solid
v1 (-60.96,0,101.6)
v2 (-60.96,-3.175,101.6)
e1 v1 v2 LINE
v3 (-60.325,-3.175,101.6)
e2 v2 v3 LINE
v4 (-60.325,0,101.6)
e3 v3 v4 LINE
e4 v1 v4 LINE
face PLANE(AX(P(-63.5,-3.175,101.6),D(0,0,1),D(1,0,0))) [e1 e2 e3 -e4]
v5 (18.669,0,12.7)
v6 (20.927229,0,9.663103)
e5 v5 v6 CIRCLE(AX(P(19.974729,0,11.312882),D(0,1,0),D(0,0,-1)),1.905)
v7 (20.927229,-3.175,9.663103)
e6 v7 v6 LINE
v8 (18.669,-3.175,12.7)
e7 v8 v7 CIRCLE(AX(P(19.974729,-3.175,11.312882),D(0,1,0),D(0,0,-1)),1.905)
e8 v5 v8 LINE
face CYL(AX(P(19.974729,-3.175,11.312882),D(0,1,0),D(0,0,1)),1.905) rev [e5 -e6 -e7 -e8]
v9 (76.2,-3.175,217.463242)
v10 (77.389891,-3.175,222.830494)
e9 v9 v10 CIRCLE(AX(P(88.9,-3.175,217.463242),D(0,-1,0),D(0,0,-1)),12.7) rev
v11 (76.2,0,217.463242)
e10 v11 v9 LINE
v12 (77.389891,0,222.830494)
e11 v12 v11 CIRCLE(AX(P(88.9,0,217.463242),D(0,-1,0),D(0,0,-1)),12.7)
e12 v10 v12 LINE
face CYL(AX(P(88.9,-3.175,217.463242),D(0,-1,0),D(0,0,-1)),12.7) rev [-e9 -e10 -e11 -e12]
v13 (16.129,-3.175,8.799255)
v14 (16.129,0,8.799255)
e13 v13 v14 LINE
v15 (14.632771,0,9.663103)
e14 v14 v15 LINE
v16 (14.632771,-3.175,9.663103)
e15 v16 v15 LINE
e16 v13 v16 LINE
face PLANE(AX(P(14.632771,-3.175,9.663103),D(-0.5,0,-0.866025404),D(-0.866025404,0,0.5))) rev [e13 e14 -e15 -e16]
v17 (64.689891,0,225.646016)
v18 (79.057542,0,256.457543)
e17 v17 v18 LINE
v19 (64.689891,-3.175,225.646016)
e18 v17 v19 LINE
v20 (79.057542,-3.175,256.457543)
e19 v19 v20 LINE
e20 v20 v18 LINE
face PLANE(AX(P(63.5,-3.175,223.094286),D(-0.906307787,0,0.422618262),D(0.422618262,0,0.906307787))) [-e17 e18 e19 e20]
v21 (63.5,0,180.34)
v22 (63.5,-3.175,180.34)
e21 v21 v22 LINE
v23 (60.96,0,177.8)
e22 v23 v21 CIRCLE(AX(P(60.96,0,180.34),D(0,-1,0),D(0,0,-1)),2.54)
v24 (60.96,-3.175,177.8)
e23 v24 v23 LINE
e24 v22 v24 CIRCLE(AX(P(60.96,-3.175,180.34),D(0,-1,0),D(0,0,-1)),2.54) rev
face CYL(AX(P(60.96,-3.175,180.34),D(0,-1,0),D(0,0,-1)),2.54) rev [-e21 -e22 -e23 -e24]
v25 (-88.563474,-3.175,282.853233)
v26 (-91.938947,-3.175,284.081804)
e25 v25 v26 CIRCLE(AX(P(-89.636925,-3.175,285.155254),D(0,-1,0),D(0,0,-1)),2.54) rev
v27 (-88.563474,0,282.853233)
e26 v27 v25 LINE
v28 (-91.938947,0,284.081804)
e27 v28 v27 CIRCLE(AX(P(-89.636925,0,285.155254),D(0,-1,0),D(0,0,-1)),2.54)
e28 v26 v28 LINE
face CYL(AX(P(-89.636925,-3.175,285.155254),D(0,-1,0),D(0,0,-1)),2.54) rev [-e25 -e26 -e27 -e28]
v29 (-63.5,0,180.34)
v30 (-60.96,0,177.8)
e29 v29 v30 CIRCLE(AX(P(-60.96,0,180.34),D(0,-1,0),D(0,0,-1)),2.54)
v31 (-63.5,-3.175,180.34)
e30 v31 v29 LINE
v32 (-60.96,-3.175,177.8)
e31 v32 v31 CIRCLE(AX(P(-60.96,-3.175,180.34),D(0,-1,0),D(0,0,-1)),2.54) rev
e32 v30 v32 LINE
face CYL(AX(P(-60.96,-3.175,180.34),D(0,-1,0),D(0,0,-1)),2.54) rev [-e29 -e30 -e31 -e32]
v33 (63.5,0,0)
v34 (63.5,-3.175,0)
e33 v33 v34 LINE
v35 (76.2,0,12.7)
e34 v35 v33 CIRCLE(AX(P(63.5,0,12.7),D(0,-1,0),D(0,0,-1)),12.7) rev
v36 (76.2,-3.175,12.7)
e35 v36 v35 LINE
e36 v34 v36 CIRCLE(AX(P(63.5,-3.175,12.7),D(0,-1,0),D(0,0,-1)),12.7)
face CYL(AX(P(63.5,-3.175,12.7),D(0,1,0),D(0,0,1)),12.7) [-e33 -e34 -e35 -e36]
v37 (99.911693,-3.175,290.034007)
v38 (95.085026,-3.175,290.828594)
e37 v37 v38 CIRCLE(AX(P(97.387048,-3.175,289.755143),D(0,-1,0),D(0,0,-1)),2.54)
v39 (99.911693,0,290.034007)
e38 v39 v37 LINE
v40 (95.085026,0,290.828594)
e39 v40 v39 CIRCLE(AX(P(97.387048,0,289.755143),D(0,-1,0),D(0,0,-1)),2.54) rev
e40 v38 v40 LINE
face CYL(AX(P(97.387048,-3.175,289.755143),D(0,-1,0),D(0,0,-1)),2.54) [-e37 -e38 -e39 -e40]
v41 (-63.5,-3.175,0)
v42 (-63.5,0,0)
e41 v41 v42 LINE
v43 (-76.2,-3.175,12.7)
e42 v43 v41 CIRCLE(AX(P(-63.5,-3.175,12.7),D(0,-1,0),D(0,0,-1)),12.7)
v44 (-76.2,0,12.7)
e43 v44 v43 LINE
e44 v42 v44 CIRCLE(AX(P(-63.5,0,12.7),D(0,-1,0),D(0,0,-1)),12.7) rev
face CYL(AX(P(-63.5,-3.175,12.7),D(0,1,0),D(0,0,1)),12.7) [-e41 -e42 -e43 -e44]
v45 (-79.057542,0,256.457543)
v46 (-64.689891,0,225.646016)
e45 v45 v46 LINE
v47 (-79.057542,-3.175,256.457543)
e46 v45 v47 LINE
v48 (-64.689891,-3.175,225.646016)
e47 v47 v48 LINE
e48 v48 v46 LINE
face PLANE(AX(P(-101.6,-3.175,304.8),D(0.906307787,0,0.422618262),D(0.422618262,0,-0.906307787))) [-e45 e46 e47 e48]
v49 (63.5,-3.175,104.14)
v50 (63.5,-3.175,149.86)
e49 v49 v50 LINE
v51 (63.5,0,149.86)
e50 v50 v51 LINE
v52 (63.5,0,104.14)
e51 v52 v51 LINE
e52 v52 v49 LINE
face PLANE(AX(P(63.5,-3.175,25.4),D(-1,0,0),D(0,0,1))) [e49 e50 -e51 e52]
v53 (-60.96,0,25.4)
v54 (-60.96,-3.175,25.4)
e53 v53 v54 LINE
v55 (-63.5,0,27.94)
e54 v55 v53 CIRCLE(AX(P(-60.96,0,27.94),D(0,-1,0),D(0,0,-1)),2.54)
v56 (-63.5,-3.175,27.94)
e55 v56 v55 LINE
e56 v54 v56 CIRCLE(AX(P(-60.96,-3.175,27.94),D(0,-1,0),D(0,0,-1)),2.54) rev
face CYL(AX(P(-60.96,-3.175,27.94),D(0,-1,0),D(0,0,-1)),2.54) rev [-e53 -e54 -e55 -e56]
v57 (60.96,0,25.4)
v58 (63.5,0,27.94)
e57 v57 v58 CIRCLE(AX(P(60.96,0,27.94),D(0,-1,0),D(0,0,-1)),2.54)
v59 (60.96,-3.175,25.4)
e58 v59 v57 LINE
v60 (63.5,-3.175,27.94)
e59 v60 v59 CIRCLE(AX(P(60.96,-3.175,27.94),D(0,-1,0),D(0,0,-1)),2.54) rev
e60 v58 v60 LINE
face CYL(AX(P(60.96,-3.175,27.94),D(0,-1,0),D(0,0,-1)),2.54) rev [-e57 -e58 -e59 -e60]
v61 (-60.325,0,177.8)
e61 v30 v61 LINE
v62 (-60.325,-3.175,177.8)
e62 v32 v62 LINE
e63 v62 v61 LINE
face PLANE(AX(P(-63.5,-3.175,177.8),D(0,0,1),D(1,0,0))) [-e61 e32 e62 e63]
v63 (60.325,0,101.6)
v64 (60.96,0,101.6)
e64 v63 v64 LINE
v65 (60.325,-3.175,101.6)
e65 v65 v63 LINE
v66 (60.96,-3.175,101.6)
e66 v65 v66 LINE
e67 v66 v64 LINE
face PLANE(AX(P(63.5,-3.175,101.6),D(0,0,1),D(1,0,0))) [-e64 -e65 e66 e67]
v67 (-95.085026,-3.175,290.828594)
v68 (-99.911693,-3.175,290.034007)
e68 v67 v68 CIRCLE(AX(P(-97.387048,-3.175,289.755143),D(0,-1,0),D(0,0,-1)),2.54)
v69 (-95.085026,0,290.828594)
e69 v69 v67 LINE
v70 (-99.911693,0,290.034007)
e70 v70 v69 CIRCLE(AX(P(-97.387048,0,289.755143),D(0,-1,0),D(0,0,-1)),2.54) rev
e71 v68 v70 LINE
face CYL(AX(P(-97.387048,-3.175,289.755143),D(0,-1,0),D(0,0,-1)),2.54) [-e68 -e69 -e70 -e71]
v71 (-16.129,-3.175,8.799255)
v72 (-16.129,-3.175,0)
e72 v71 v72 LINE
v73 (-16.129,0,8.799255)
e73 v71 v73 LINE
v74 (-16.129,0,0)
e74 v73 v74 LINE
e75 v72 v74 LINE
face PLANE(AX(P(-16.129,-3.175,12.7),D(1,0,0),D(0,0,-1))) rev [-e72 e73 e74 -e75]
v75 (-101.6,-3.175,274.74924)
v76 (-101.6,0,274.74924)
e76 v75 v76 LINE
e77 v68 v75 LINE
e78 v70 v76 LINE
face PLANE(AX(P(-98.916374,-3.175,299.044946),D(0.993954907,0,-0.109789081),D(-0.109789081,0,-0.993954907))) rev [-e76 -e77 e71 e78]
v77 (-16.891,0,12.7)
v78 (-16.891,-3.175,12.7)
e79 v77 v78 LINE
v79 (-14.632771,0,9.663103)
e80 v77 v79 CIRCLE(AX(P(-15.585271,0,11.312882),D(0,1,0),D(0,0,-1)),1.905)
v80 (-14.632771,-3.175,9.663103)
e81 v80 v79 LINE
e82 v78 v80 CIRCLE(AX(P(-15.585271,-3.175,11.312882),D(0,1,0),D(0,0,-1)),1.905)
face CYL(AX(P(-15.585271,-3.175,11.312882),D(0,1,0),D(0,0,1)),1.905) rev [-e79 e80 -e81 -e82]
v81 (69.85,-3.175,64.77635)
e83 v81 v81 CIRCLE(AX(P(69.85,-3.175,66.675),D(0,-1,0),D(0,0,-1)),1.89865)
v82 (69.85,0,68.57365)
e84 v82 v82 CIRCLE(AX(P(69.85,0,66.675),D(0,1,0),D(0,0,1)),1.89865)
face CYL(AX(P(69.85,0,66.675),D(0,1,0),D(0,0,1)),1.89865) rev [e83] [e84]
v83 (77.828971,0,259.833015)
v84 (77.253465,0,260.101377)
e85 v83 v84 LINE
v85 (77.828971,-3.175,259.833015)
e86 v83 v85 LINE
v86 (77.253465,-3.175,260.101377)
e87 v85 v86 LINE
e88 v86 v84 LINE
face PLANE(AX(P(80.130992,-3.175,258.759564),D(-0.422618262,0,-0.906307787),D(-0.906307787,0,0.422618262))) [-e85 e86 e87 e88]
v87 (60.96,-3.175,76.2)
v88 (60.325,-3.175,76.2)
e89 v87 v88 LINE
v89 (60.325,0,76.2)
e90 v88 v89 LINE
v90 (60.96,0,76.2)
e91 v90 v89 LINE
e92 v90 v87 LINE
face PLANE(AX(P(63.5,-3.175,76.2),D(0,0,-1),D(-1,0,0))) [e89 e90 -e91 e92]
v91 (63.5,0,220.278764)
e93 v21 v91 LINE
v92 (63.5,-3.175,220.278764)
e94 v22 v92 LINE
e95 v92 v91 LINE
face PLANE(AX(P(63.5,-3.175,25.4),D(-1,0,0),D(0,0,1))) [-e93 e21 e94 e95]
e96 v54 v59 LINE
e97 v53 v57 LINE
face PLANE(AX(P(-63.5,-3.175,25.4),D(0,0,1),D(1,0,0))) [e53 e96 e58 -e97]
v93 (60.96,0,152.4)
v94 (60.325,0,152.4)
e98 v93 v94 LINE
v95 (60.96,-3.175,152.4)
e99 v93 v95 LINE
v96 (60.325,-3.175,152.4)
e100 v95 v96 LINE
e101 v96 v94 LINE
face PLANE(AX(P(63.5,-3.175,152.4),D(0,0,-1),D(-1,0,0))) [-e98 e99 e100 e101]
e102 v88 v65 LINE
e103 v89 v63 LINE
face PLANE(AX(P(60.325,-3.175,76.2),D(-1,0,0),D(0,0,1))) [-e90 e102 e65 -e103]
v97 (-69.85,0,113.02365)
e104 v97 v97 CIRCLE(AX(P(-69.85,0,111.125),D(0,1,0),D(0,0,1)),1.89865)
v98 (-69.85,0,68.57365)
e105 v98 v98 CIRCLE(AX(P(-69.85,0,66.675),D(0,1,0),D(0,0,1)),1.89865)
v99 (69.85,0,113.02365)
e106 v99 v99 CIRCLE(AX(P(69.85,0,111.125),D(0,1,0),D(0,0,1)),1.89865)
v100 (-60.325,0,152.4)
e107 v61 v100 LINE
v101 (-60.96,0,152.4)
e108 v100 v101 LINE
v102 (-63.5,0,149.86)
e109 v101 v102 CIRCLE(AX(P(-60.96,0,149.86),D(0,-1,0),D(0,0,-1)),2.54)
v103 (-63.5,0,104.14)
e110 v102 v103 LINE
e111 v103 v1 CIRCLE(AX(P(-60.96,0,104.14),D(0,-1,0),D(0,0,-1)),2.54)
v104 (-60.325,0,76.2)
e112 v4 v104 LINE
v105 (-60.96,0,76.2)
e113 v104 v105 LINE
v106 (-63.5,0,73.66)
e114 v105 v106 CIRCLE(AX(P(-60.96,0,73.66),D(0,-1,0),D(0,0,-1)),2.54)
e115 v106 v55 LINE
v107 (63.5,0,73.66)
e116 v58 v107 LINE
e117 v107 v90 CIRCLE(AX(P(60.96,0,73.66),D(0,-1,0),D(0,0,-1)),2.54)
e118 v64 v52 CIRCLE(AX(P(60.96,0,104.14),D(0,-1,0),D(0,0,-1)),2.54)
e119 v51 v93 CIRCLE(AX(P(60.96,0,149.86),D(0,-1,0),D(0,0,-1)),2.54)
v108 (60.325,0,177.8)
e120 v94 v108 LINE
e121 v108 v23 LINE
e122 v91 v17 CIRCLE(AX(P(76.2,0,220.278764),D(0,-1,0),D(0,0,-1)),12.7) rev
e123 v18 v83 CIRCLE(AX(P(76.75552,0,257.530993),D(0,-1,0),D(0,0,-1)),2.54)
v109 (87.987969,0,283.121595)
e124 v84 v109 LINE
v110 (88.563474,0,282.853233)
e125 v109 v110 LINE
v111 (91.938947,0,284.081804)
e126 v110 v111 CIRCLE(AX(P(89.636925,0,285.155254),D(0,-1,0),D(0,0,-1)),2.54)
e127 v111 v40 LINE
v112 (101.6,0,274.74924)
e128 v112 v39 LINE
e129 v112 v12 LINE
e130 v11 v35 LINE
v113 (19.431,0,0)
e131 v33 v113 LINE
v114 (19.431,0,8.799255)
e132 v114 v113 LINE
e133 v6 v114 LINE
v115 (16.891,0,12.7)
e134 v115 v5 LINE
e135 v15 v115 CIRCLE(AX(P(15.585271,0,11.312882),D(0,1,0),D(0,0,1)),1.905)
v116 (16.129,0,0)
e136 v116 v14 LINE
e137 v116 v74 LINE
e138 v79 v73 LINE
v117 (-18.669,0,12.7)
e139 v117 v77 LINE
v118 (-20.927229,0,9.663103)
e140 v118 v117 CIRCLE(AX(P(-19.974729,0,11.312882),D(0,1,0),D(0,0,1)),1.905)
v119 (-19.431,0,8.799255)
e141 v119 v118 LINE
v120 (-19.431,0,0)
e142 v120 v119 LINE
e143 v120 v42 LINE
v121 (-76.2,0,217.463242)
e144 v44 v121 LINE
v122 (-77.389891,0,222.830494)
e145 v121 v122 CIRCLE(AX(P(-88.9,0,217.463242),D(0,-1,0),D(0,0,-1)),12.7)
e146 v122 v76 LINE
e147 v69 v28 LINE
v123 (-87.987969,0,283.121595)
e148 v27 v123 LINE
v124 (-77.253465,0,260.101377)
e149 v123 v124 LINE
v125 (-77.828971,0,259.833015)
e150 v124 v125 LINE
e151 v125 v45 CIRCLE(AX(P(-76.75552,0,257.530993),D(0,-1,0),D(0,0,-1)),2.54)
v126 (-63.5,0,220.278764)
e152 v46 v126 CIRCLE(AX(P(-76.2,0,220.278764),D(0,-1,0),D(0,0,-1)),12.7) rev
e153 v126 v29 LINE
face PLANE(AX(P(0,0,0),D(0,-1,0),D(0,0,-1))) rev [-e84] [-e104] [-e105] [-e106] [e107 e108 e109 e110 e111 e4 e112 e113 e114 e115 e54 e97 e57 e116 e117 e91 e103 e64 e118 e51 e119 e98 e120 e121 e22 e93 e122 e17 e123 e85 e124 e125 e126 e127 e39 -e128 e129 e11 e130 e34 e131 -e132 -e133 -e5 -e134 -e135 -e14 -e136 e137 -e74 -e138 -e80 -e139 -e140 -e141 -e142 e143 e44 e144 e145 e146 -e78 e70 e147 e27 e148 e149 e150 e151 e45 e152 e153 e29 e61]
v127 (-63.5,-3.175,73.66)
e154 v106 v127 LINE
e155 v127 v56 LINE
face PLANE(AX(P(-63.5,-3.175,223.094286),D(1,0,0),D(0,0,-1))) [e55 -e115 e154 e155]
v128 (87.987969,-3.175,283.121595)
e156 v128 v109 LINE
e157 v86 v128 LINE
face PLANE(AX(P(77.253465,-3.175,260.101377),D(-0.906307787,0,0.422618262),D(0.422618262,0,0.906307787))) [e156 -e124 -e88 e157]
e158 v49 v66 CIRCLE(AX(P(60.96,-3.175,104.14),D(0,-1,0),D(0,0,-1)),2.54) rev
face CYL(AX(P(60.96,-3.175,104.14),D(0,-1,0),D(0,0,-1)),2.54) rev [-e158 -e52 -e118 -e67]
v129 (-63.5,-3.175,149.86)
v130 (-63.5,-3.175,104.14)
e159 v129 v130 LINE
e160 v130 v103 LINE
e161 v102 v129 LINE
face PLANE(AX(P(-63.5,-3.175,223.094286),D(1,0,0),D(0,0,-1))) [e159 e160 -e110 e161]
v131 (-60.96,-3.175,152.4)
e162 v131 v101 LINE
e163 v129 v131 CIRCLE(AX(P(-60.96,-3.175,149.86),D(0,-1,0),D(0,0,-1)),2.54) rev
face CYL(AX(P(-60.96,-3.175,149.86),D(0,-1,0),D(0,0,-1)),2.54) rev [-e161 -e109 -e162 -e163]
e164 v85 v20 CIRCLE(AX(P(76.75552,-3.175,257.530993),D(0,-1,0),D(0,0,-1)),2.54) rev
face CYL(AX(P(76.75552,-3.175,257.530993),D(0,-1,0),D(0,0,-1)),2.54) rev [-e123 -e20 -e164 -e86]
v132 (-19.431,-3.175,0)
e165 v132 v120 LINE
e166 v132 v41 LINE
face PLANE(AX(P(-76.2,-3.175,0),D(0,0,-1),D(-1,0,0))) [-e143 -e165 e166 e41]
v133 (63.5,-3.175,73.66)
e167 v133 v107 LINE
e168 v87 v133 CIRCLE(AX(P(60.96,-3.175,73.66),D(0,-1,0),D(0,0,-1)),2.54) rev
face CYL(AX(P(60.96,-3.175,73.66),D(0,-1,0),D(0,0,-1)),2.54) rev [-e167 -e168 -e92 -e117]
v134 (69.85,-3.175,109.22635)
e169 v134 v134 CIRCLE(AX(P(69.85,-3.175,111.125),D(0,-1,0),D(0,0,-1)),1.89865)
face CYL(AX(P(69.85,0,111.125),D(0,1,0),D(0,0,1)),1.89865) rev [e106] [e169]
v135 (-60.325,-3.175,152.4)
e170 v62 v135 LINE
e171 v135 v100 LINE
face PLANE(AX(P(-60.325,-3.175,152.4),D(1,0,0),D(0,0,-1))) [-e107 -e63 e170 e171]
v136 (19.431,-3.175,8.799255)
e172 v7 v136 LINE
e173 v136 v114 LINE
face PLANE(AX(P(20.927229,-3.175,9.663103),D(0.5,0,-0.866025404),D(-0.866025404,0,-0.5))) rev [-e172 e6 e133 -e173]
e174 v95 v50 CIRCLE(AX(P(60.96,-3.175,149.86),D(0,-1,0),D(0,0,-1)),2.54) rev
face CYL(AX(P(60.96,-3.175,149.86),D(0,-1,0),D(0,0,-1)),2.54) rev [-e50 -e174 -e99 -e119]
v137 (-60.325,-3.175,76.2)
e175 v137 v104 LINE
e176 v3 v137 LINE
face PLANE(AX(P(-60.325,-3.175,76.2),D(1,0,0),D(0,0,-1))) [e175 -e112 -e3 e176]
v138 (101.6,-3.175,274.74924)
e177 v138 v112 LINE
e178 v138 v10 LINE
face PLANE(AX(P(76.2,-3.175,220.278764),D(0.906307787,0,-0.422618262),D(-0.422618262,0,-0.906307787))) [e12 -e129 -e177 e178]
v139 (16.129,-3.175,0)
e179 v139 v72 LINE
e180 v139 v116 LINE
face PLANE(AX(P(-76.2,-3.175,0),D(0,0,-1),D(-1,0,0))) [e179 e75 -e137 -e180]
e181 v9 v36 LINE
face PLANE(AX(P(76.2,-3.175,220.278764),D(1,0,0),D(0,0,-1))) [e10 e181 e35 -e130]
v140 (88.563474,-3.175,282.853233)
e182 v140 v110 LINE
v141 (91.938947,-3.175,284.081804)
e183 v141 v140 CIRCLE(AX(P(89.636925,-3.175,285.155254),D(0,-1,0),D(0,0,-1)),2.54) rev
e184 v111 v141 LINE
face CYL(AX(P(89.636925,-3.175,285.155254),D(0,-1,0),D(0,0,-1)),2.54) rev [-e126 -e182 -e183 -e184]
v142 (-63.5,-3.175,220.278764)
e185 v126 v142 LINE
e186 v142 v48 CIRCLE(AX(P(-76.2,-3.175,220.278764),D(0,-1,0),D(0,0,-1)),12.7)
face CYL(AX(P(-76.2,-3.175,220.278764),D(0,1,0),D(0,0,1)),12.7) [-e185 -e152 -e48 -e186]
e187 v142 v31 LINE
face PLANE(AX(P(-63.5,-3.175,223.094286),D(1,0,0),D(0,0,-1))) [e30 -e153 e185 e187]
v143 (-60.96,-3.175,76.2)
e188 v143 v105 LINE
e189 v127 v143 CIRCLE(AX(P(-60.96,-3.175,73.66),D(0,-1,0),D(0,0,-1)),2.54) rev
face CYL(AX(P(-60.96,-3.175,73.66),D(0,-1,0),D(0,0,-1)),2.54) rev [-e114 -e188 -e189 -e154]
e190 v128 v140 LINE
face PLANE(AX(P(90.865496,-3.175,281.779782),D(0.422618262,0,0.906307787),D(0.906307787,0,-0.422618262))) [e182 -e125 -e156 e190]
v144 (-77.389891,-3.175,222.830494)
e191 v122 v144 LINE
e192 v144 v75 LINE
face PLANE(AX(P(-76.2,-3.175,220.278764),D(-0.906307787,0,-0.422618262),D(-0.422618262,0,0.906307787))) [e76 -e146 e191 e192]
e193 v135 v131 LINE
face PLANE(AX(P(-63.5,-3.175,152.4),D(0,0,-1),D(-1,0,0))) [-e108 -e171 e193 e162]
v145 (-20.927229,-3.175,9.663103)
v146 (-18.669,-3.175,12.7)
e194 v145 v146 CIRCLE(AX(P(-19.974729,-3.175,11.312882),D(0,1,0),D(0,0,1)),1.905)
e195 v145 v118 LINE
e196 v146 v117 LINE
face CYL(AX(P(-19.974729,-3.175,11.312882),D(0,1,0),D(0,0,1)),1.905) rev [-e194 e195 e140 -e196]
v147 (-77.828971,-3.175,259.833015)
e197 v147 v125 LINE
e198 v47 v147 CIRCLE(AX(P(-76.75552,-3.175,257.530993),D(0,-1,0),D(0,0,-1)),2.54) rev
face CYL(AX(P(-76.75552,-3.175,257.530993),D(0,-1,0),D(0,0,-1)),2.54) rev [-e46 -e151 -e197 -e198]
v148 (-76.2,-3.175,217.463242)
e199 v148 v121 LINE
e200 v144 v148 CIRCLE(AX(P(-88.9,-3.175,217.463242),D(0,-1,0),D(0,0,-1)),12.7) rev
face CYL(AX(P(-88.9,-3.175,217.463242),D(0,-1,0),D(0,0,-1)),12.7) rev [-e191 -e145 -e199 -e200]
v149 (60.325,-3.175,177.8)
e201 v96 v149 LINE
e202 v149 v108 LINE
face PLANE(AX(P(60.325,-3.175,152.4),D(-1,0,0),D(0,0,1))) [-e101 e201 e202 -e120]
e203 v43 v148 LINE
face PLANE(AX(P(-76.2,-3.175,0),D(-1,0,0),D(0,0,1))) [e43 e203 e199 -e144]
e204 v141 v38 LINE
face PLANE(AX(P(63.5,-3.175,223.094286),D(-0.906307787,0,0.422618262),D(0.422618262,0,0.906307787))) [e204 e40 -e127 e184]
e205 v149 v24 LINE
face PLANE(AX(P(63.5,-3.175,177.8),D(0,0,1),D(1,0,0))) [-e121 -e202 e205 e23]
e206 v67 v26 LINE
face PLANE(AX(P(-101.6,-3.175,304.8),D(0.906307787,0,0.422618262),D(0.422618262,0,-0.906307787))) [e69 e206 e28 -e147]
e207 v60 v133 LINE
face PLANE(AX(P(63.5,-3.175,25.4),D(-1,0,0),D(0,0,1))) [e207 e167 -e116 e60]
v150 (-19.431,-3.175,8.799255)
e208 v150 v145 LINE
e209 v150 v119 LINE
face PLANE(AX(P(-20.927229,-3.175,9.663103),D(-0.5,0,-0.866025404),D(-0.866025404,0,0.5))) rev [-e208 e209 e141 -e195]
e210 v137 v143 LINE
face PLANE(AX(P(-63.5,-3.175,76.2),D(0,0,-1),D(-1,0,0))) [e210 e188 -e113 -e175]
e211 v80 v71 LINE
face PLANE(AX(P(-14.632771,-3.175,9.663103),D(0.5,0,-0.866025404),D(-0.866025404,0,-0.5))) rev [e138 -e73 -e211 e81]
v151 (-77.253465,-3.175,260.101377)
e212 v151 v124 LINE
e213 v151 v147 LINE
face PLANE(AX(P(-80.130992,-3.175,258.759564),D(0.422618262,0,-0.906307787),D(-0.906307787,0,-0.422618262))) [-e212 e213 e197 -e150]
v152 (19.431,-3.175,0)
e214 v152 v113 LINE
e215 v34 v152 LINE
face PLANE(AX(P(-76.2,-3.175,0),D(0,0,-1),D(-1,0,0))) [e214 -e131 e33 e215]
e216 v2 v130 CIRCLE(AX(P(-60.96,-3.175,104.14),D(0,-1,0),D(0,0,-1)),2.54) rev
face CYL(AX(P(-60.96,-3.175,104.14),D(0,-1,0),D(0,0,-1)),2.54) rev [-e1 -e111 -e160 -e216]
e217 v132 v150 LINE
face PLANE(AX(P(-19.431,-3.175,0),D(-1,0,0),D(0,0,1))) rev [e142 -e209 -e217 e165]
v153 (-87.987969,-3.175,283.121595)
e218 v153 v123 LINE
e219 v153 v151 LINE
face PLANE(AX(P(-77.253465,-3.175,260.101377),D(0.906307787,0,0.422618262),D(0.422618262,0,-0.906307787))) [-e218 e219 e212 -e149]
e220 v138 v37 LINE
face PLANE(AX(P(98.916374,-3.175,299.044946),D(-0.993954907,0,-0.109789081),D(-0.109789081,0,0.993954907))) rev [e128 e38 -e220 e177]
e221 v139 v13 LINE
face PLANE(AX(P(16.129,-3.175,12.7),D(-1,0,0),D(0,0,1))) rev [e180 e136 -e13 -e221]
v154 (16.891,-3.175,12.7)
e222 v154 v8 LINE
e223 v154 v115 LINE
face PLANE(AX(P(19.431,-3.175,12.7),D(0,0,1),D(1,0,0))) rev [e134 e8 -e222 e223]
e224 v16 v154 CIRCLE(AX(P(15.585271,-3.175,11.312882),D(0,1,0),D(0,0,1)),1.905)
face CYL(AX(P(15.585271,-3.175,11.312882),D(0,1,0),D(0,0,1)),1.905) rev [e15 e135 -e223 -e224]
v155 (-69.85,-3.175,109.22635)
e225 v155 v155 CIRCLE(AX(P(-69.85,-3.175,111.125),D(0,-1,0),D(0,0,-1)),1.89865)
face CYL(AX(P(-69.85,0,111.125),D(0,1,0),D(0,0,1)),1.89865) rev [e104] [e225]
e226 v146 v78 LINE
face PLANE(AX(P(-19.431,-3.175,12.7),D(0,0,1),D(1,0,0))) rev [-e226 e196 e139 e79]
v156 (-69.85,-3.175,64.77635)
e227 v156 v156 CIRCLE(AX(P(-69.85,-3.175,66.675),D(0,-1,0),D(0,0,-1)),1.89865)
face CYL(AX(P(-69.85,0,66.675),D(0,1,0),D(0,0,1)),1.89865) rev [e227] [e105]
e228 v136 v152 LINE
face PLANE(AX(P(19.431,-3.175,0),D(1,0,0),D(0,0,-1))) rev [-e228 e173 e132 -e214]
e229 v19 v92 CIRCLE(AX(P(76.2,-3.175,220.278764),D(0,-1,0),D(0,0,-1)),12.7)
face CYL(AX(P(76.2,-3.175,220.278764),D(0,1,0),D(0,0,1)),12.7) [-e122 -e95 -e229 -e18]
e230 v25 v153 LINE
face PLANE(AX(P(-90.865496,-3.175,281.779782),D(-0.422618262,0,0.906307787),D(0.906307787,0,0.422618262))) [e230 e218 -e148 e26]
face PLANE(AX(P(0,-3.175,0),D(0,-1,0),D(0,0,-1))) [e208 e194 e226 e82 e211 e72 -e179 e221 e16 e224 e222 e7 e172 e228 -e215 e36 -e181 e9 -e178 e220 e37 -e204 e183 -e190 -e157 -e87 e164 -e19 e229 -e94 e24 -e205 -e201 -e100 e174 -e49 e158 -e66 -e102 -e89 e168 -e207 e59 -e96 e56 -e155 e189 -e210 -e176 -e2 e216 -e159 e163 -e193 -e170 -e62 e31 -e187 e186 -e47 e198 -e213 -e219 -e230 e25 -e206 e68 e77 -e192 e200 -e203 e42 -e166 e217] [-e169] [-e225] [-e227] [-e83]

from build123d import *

# Parameters (mm, degrees)
BASE_FLANGE1_DEPTH    = 3.175
SKETCH7_W             = 3.302
SKETCH7_H             = 12.7
CUT_EXTRUDE1_DEPTH    = 326.126156068
SKETCH12_W            = 3.175
SKETCH12_H            = 25.4
TAB1_DEPTH            = 3.175
CUT_EXTRUDE2_DEPTH    = 326.126156068
FILLET1_R             = 2.54
CUT_EXTRUDE3_DEPTH    = 316.848888055
FILLET2_R             = 12.7
FILLET3_R             = 2.54
F_6_CLEARANCE_HOLE1_D = 3.7973


# Sheet-metal steps are written as plain solids
with BuildPart() as part:
    # Sketch1 → Base-Flange1 (new body)
    with BuildSketch(Plane(origin=(0, 0, 0), x_dir=(1, 0, 0), z_dir=(0, 1, 0))):
        Polygon((-76.2, 0), (76.2, 0), (76.2, -220.278764113), (113.110108895, -299.432748076), (101.6, -304.8), (63.5, -223.094286329), (63.5, -25.4), (-63.5, -25.4), (-63.5, -223.094286329), (-101.6, -304.8), (-113.110108895, -299.432748076), (-76.2, -220.278764113), align=None)
    extrude(amount=-BASE_FLANGE1_DEPTH)

    # Sketch7 → Cut-Extrude1 (cut, through all)
    with BuildSketch(Plane(origin=(0, 0, 0), x_dir=(1, 0, 0), z_dir=(0, 1, 0))):
        with Locations((-17.78, -6.35)):
            Rectangle(SKETCH7_W, SKETCH7_H)
        with Locations((17.78, -6.35)):
            Rectangle(SKETCH7_W, SKETCH7_H)
    extrude(amount=-CUT_EXTRUDE1_DEPTH, mode=Mode.SUBTRACT)

    # Sketch12 → Tab1 (add)
    with BuildSketch(Plane(origin=(0, 0, 0), x_dir=(1, 0, 0), z_dir=(0, 1, 0))):
        with Locations((-61.9125, -88.9)):
            Rectangle(SKETCH12_W, SKETCH12_H)
        Polygon((-80.130992304, -258.759564419), (-90.865496152, -281.779782209), (-87.987968928, -283.12159519), (-77.25346508, -260.1013774), align=None)
        with Locations((-61.9125, -165.1)):
            Rectangle(SKETCH12_W, SKETCH12_H)
        Polygon((77.25346508, -260.1013774), (87.987968928, -283.12159519), (90.865496152, -281.779782209), (80.130992304, -258.759564419), align=None)
        with Locations((61.9125, -165.1)):
            Rectangle(SKETCH12_W, SKETCH12_H)
        with Locations((61.9125, -88.9)):
            Rectangle(SKETCH12_W, SKETCH12_H)
    extrude(amount=-TAB1_DEPTH)

    # Sketch13 → Cut-Extrude2 (cut, through all)
    with BuildSketch(Plane(origin=(0, 0, 0), x_dir=(1, 0, 0), z_dir=(0, 1, 0))):
        Polygon((-101.6, -304.8), (-98.916374038, -299.044945552), (-101.6, -274.749239894), (-113.110108895, -299.432748076), align=None)
        Polygon((101.6, -304.8), (98.916374038, -299.044945552), (101.6, -274.749239894), (113.110108895, -299.432748076), align=None)
    extrude(amount=-CUT_EXTRUDE2_DEPTH, mode=Mode.SUBTRACT)

    # Fillet1
    fillet1_edges = [part.edges().sort_by_distance(p)[0] for p in [
        (63.5, -1.5875, 152.4),
        (63.5, -1.5875, 177.8),
        (80.130992304, -1.5875, 258.759564419),
        (90.865496152, -1.5875, 281.779782209),
        (-80.130992304, -1.5875, 258.759564419),
        (-90.865496152, -1.5875, 281.779782209),
        (-63.5, -1.5875, 177.8),
        (-63.5, -1.5875, 152.4),
        (-63.5, -1.5875, 101.6),
        (-63.5, -1.5875, 76.2),
        (63.5, -1.5875, 25.4),
        (-63.5, -1.5875, 25.4),
        (63.5, -1.5875, 76.2),
        (63.5, -1.5875, 101.6),
    ]]
    fillet(fillet1_edges, radius=FILLET1_R)

    # Sketch14 → Cut-Extrude3 (cut, through all)
    with BuildSketch(Plane(origin=(0, 0, 0), x_dir=(1, 0, 0), z_dir=(0, 1, 0))):
        with BuildLine():
            Line((-20.927228778, -9.663103241), (-19.431, -8.799255153))
            Line((-19.431, -8.799255153), (-19.431, -9.487125897))
            ThreePointArc((-19.431, -9.487125897), (-19.752208028, -13.204840809), (-20.927228778, -9.663103241))
        make_face()
        with BuildLine():
            Line((-16.129, -8.799255153), (-16.129, -9.487125897))
            ThreePointArc((-16.129, -9.487125897), (-15.807791972, -13.204840809), (-14.632771222, -9.663103241))
            Line((-14.632771222, -9.663103241), (-16.129, -8.799255153))
        make_face()
        with BuildLine():
            Line((19.431, -8.799255153), (19.431, -9.487125897))
            ThreePointArc((19.431, -9.487125897), (19.752208028, -13.204840809), (20.927228778, -9.663103241))
            Line((20.927228778, -9.663103241), (19.431, -8.799255153))
        make_face()
        with BuildLine():
            Line((14.632771222, -9.663103241), (16.129, -8.799255153))
            Line((16.129, -8.799255153), (16.129, -9.487125897))
            ThreePointArc((16.129, -9.487125897), (15.807791972, -13.204840809), (14.632771222, -9.663103241))
        make_face()
    extrude(amount=-CUT_EXTRUDE3_DEPTH, mode=Mode.SUBTRACT)

    # Fillet2
    fillet2_edges = [part.edges().sort_by_distance(p)[0] for p in [
        (76.2, -1.5875, 220.278764113),
        (63.5, -1.5875, 223.094286329),
        (-63.5, -1.5875, 223.094286329),
        (-76.2, -1.5875, 220.278764113),
        (-76.2, -1.5875, 0),
        (76.2, -1.5875, 0),
    ]]
    fillet(fillet2_edges, radius=FILLET2_R)

    # Fillet3
    fillet3_edges = [part.edges().sort_by_distance(p)[0] for p in [
        (-98.916374038, -1.5875, 299.044945552),
        (98.916374038, -1.5875, 299.044945552),
    ]]
    fillet(fillet3_edges, radius=FILLET3_R)

    # #6 Clearance Hole1 (through all)
    with Locations(Plane(origin=(0, 0, 0), x_dir=(1, 0, 0), z_dir=(0, 1, 0))):
        with Locations((69.85, -66.675), (69.85, -111.125), (-69.85, -111.125), (-69.85, -66.675)):
            Hole(F_6_CLEARANCE_HOLE1_D / 2)


solid = part.part
